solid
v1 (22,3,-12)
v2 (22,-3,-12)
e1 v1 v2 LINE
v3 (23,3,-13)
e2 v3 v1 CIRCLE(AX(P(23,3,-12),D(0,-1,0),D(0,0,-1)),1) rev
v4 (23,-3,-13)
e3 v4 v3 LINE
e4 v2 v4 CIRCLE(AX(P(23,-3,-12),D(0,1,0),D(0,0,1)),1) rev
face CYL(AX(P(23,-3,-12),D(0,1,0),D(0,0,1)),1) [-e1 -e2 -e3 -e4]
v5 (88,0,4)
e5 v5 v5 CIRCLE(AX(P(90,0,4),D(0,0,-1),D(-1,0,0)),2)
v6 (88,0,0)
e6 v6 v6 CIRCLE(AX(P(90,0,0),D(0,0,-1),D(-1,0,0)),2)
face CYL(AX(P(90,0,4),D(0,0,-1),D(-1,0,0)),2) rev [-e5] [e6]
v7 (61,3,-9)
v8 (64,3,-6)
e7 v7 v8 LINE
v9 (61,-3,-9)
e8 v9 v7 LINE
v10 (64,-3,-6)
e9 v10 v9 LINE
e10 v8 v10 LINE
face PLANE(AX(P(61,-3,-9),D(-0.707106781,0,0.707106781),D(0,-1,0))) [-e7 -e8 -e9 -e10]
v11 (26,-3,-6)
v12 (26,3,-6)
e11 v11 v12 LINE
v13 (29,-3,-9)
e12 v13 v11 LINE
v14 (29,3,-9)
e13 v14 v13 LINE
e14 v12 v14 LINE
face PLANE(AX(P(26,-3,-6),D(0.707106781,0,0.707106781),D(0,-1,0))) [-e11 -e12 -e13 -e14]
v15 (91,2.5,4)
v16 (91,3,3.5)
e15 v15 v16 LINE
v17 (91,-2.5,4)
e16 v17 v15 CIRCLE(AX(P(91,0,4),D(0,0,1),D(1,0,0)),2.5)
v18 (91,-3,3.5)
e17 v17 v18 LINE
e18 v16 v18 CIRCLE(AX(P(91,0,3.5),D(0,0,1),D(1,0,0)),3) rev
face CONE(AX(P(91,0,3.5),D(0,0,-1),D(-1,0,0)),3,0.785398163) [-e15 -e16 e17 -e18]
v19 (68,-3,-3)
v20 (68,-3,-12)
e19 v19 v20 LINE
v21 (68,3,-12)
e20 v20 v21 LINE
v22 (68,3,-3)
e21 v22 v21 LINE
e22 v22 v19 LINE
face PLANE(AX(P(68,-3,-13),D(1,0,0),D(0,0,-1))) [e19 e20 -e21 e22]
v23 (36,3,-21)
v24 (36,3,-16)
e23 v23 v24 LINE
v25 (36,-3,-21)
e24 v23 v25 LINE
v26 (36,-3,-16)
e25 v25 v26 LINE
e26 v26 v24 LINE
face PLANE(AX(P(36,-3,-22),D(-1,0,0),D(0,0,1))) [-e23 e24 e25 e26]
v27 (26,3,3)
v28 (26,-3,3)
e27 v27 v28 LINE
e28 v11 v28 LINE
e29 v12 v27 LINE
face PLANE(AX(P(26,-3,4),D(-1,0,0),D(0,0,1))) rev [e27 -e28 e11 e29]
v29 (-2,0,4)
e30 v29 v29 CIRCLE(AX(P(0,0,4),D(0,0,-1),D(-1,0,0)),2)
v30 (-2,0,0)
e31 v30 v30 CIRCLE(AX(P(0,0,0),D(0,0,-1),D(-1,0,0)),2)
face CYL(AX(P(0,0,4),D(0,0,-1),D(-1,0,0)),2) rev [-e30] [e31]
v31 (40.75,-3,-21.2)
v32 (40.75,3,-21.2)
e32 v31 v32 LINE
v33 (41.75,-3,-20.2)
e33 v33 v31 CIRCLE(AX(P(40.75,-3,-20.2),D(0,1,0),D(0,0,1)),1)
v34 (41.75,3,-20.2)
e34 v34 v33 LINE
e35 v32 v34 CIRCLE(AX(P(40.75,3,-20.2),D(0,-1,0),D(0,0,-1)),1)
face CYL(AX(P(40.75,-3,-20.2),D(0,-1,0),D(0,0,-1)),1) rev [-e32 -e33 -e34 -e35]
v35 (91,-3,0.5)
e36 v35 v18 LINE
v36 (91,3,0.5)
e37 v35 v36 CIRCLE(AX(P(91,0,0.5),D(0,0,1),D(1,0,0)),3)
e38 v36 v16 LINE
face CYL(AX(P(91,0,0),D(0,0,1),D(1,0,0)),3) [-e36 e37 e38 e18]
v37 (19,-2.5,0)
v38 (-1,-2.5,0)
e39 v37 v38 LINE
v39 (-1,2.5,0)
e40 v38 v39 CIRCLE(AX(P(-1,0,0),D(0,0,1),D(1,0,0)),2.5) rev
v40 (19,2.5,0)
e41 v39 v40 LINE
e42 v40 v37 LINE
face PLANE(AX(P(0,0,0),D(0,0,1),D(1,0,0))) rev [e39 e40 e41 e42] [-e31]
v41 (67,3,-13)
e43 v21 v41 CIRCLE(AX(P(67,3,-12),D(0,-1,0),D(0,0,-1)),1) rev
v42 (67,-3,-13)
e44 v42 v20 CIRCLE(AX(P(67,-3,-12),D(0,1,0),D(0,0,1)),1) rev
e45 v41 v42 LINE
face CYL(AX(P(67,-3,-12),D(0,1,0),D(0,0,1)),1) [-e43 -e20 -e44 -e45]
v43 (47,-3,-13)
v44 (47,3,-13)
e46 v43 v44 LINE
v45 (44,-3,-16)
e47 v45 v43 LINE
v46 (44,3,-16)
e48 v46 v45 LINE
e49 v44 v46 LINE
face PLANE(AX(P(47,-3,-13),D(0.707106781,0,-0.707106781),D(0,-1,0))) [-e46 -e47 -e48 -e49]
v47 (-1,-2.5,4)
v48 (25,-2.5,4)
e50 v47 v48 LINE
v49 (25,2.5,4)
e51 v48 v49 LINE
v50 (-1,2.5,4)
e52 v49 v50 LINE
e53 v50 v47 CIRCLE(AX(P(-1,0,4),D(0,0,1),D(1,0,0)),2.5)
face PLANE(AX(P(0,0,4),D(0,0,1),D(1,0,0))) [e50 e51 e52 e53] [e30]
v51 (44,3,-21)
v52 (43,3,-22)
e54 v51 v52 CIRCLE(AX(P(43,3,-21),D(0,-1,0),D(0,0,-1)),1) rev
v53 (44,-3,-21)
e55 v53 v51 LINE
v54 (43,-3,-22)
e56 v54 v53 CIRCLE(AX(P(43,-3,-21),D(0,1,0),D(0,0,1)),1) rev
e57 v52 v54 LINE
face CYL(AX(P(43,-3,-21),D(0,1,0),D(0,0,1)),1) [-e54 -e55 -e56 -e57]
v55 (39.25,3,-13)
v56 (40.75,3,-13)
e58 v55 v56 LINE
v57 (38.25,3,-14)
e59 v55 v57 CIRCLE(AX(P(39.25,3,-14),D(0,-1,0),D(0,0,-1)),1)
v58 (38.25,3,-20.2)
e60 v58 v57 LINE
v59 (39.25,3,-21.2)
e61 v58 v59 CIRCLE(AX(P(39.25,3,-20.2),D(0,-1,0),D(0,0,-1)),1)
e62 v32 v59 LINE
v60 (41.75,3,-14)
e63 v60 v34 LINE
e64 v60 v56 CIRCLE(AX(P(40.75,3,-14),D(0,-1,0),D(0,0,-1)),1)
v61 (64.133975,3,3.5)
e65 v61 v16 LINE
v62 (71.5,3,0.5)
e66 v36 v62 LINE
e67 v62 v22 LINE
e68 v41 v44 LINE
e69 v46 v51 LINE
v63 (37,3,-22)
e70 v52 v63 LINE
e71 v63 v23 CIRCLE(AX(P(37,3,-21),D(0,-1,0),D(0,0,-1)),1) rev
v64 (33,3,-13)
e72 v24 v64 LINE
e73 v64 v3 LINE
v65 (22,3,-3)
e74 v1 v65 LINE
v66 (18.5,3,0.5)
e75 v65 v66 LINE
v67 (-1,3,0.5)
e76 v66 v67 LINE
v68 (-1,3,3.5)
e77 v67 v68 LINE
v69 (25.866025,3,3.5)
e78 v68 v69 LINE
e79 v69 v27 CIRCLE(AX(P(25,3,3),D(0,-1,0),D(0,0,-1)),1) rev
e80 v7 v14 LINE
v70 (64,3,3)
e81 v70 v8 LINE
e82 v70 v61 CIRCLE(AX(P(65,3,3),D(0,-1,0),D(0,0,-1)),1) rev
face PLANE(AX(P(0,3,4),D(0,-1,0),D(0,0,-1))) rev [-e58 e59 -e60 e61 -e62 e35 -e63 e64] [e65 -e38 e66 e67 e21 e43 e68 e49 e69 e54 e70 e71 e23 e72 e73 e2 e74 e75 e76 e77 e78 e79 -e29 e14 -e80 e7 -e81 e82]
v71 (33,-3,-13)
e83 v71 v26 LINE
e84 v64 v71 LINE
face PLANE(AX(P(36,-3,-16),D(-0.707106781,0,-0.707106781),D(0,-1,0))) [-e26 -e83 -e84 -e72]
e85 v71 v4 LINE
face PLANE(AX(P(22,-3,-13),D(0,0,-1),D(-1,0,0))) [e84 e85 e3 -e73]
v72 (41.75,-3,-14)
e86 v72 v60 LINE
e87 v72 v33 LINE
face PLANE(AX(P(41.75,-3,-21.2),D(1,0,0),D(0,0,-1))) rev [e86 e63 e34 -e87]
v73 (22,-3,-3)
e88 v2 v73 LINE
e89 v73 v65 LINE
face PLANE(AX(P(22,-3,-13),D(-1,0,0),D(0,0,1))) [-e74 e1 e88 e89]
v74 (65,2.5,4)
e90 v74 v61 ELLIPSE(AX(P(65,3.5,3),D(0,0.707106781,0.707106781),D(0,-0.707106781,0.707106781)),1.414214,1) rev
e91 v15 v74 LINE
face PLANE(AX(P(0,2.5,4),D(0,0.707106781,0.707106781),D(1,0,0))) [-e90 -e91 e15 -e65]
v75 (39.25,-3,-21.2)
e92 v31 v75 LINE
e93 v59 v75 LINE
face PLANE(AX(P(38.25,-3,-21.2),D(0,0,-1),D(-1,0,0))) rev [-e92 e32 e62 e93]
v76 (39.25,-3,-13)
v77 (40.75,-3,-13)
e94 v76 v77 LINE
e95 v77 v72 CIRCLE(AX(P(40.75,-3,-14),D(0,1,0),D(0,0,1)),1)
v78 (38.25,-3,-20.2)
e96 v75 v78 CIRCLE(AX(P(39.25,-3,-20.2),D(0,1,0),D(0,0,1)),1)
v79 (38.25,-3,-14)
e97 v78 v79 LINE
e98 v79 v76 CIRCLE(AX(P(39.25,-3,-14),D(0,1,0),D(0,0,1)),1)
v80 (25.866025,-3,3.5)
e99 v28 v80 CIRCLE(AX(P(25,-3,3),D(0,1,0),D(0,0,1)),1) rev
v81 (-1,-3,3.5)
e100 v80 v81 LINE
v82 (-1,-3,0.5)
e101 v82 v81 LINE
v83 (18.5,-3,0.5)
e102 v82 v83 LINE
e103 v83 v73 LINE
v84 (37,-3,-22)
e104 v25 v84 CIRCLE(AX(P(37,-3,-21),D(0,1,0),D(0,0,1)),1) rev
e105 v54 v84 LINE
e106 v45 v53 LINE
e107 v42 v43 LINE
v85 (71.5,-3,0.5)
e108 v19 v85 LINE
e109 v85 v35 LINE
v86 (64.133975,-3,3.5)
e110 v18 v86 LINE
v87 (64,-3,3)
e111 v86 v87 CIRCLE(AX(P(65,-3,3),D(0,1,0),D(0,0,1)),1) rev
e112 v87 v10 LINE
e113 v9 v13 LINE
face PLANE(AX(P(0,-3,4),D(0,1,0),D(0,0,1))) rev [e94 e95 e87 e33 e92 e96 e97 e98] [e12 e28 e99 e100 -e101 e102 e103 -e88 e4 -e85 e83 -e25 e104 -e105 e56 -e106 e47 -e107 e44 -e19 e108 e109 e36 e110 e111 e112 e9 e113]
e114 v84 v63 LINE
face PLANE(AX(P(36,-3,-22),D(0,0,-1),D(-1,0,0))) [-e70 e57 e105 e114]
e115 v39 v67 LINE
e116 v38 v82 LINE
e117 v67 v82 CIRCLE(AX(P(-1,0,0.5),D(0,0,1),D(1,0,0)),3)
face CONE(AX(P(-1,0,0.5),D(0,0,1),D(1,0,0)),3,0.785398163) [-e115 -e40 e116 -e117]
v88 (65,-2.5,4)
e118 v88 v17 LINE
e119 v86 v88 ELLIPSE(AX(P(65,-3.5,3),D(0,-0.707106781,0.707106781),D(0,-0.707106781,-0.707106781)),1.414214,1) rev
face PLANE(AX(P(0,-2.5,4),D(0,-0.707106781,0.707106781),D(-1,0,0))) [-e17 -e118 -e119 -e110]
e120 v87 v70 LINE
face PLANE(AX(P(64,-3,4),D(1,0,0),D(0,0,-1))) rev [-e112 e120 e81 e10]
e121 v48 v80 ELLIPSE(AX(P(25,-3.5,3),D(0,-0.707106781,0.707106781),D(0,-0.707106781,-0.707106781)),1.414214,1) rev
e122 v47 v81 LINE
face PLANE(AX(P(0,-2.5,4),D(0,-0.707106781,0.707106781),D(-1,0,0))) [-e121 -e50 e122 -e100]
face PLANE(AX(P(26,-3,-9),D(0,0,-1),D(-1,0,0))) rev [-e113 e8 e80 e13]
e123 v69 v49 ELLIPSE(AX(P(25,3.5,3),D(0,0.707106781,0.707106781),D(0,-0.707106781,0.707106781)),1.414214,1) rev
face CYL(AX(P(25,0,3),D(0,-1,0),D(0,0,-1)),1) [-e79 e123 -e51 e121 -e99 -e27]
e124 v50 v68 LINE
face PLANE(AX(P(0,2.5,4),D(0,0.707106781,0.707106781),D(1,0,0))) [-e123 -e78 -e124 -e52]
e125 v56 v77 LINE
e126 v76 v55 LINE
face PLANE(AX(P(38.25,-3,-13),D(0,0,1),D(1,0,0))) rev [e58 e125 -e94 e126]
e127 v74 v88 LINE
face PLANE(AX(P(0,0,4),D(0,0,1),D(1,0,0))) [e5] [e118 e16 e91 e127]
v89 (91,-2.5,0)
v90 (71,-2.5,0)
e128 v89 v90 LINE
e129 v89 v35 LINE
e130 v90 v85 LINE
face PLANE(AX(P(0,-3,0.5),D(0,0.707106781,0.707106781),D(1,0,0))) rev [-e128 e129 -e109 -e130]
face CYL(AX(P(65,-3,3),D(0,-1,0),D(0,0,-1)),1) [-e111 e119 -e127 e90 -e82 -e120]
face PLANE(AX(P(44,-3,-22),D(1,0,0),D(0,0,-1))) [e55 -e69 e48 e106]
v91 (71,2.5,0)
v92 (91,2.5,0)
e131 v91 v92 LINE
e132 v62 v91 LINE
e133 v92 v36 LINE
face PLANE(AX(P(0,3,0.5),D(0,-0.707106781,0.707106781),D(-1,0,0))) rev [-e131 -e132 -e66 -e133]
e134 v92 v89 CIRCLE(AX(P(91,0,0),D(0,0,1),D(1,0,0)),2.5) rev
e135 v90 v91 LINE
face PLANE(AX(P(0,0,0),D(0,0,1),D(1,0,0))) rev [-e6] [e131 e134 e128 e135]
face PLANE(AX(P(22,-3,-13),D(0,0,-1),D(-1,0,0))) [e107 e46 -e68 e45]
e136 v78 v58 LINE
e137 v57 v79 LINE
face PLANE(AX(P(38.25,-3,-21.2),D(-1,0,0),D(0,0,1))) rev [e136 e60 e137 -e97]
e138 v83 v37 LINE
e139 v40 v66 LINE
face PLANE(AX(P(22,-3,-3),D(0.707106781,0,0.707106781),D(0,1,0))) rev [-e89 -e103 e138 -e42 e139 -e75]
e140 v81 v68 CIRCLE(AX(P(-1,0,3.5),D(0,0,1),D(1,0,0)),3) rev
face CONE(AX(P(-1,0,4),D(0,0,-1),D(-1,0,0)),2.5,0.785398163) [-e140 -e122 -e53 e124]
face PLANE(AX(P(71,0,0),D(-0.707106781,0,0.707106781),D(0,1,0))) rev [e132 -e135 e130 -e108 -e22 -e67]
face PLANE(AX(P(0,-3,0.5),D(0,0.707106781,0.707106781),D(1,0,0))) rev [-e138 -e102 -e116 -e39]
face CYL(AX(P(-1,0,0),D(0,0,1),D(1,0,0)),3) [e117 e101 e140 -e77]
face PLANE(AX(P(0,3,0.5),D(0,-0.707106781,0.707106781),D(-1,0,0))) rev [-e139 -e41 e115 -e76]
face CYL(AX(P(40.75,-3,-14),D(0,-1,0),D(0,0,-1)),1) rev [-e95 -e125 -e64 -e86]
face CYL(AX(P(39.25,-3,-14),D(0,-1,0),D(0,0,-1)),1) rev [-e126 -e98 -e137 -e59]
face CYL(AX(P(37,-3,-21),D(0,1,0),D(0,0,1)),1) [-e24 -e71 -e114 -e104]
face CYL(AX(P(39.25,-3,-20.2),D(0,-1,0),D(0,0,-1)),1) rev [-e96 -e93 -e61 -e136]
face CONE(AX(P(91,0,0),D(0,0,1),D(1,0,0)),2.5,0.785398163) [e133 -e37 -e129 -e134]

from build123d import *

# Parameters (mm, degrees)
CROQUIS1_R                = 3
SALIENTE_EXTRUIR1_DEPTH   = 4
SALIENTE_EXTRUIR1_2_DEPTH = 4
CROQUIS2_W                = 90
CROQUIS2_H                = 6
SALIENTE_EXTRUIR2_DEPTH   = 4
CROQUIS4_W                = 46
CROQUIS4_H                = 13
SALIENTE_EXTRUIR3_DEPTH   = 6
CROQUIS5_W                = 38
CROQUIS5_H                = 13
CORTAR_EXTRUIR1_DEPTH     = 95.09569597
CROQUIS6_W                = 8
CROQUIS6_H                = 9
SALIENTE_EXTRUIR4_DEPTH   = 3
CROQUIS7_W                = 3.5
CROQUIS7_H                = 8.2
CORTAR_EXTRUIR2_DEPTH     = 96.754895436
CHAFL_N1_SIZE             = 3
REDONDEO1_R               = 1
CROQUIS8_R                = 1.75
CORTAR_EXTRUIR3_DEPTH     = 97.612628574
SALIENTE_EXTRUIR5_DEPTH   = 4
CROQUIS10_R               = 2
CORTAR_EXTRUIR4_DEPTH     = 97.586748573
CHAFL_N2_SIZE             = 0.5


with BuildPart() as part:
    # Croquis1 → Saliente-Extruir1 (new body)
    with BuildSketch(Plane.XY):
        Circle(CROQUIS1_R)
    extrude(amount=SALIENTE_EXTRUIR1_DEPTH)



with BuildPart() as body_2:
    # Croquis1 → Saliente-Extruir1 2 (new body)
    with BuildSketch(Plane.XY):
        with Locations((90, 0)):
            Circle(CROQUIS1_R)
    extrude(amount=SALIENTE_EXTRUIR1_2_DEPTH)


with BuildPart() as part_1:
    add(part.part)

    add(body_2.part)  # Saliente-Extruir2 merges body 2
    # Croquis2 → Saliente-Extruir2 (add)
    with BuildSketch(Plane.XY):
        with Locations((45, 0)):
            Rectangle(CROQUIS2_W, CROQUIS2_H)
    extrude(amount=SALIENTE_EXTRUIR2_DEPTH)

    # Croquis4 → Saliente-Extruir3 (add)
    with BuildSketch(Plane(origin=(0, 3, 0), x_dir=(1, 0, 0), z_dir=(0, 1, 0))):
        with Locations((45, 6.5)):
            Rectangle(CROQUIS4_W, CROQUIS4_H)
    extrude(amount=-SALIENTE_EXTRUIR3_DEPTH)

    # Croquis5 → Cortar-Extruir1 (cut, through all)
    with BuildSketch(Plane(origin=(0, 3, 0), x_dir=(1, 0, 0), z_dir=(0, 1, 0))):
        with Locations((45, 2.5)):
            Rectangle(CROQUIS5_W, CROQUIS5_H)
    extrude(amount=-CORTAR_EXTRUIR1_DEPTH, mode=Mode.SUBTRACT)

    # Croquis6 → Saliente-Extruir4 (add, symmetric)
    with BuildSketch(Plane(origin=(0, 0, 0), x_dir=(1, 0, 0), z_dir=(0, 1, 0))):
        with Locations((40, 17.5)):
            Rectangle(CROQUIS6_W, CROQUIS6_H)
    extrude(amount=SALIENTE_EXTRUIR4_DEPTH, both=True)

    # Croquis7 → Cortar-Extruir2 (cut, through all)
    with BuildSketch(Plane(origin=(0, 3, 0), x_dir=(1, 0, 0), z_dir=(0, 1, 0))):
        with Locations((40, 17.1)):
            Rectangle(CROQUIS7_W, CROQUIS7_H)
    extrude(amount=-CORTAR_EXTRUIR2_DEPTH, mode=Mode.SUBTRACT)

    # Chaflán1
    chafl_n1_edges = [part_1.edges().sort_by_distance(p)[0] for p in [
        (22, 0, 0),
        (68, 0, 0),
        (26, 0, -9),
        (64, 0, -9),
        (36, 0, -13),
        (44, 0, -13),
    ]]
    chamfer(chafl_n1_edges, length=CHAFL_N1_SIZE)

    # Redondeo1
    redondeo1_edges = [part_1.edges().sort_by_distance(p)[0] for p in [
        (22, 0, -13),
        (68, 0, -13),
        (26, 0, 4),
        (64, 0, 4),
        (36, 0, -22),
        (44, 0, -22),
        (38.25, 0, -13),
        (38.25, 0, -21.2),
        (41.75, 0, -21.2),
        (41.75, 0, -13),
    ]]
    fillet(redondeo1_edges, radius=REDONDEO1_R)

    # Croquis8 → Cortar-Extruir3 (cut, through all)
    with BuildSketch(Plane.XY.offset(4)):
        Circle(CROQUIS8_R)
        with Locations((90, 0)):
            Circle(CROQUIS8_R)
    extrude(amount=-CORTAR_EXTRUIR3_DEPTH, mode=Mode.SUBTRACT)

    # Croquis9 → Saliente-Extruir5 (add)
    with BuildSketch(Plane.XY.offset(4)):
        with BuildLine():
            Line((-1, 3), (0, 3))
            Line((0, 3), (0, 2.5))
            ThreePointArc((0, 2.5), (-2.5, 0), (0, -2.5))
            Line((0, -2.5), (0, -3))
            Line((0, -3), (-1, -3))
            ThreePointArc((-1, -3), (-4, 0), (-1, 3))
        make_face()
    saliente_extruir5 = extrude(amount=-SALIENTE_EXTRUIR5_DEPTH)

    # Simetría1: Saliente-Extruir5 across plane
    add(saliente_extruir5.mirror(Plane(origin=(45, 0, 0), x_dir=(0, 0, 1), z_dir=(1, 0, 0))))

    # Croquis10 → Cortar-Extruir4 (cut, through all)
    with BuildSketch(Plane(origin=(0, 0, 0), x_dir=(-1, 0, 0), z_dir=(0, 0, -1))):
        Circle(CROQUIS10_R)
        with Locations((-90, 0)):
            Circle(CROQUIS10_R)
    extrude(amount=-CORTAR_EXTRUIR4_DEPTH, mode=Mode.SUBTRACT)

    # Chaflán2
    # the kernel refuses this chamfer: 0.5 mm, written as the material it takes off along each edge
    with BuildSketch(Plane(origin=(63.714158506, 3, 4), x_dir=(0, 0.027495876610586487, -0.9996219169112968), z_dir=(1, 0, 0)), Plane(origin=(-1, -3, 4), x_dir=(0, 0.9996219169112968, 0.027495876610585623), z_dir=(1, 0, 0)), Plane(origin=(-1, 3, 4), x_dir=(0, 0.027495876610590796, -0.9996219169112965), z_dir=(1, 0, 0)), Plane(origin=(63.714158506, -3, 4), x_dir=(0, 0.9996219169112968, 0.027495876610585623), z_dir=(1, 0, 0))) as chafl_n2_piece_1:
        Polygon((CHAFL_N2_SIZE * 0.999621916911, -CHAFL_N2_SIZE * 0.0274958766106), (-CHAFL_N2_SIZE * 0.0274958766106, -CHAFL_N2_SIZE * 0.999621916911), (0, 0), align=None)
    extrude(amount=27.285841494, mode=Mode.SUBTRACT)
    with BuildSketch(Plane(origin=(-1, 0, 0), x_dir=(0, -1, 0), z_dir=(1, 0, 0))) as chafl_n2_piece_2:
        Polygon((3, -CHAFL_N2_SIZE), (3 - CHAFL_N2_SIZE, 0), (3, 0), align=None)
    revolve(axis=Axis((-1, 0, 0), (0, 0, -1)), revolution_arc=180, mode=Mode.SUBTRACT)
    with BuildSketch(Plane(origin=(-1, 0, 4), x_dir=(0, -1, 0), z_dir=(1, 0, 0))) as chafl_n2_piece_3:
        Polygon((3 - CHAFL_N2_SIZE, 0), (3, CHAFL_N2_SIZE), (3, 0), align=None)
    revolve(axis=Axis((-1, 0, 4), (0, 0, -1)), revolution_arc=180, mode=Mode.SUBTRACT)
    with BuildSketch(Plane(origin=(91, 0, 4), x_dir=(0, -1, 0), z_dir=(-1, 0, 0))) as chafl_n2_piece_4:
        Polygon((3, -CHAFL_N2_SIZE), (3 - CHAFL_N2_SIZE, 0), (3, 0), align=None)
    revolve(axis=Axis((91, 0, 4), (0, 0, 1)), revolution_arc=180, mode=Mode.SUBTRACT)
    with BuildSketch(Plane(origin=(91, 0, 0), x_dir=(0, -1, 0), z_dir=(-1, 0, 0))) as chafl_n2_piece_5:
        Polygon((3 - CHAFL_N2_SIZE, 0), (3, CHAFL_N2_SIZE), (3, 0), align=None)
    revolve(axis=Axis((91, 0, 0), (0, 0, 1)), revolution_arc=180, mode=Mode.SUBTRACT)
    with BuildSketch(Plane(origin=(91, -3, 0), x_dir=(0, 0.9996219169112968, -0.027495876610586365), z_dir=(-1, 0, 0))) as chafl_n2_piece_6_section:
        Polygon((CHAFL_N2_SIZE * 0.999621916911, -CHAFL_N2_SIZE * 0.0274958766106), (-CHAFL_N2_SIZE * 0.0274958766106, -CHAFL_N2_SIZE * 0.999621916911), (0, 0), align=None)
    chafl_n2_piece_6 = extrude(amount=21.285841494, mode=Mode.PRIVATE)
    chafl_n2_piece_6 = split(chafl_n2_piece_6, bisect_by=Plane(origin=(80.80759364, -2.786891573, 9.80759364), z_dir=(0.7071067811865476, 0, -0.7071067811865476)), keep=Keep.TOP, mode=Mode.PRIVATE)
    add(chafl_n2_piece_6, mode=Mode.SUBTRACT)
    with BuildSketch(Plane(origin=(20.285841494, -3, 0), x_dir=(0, 0.9996219169112968, -0.027495876610586365), z_dir=(-1, 0, 0))) as chafl_n2_piece_7_section:
        Polygon((CHAFL_N2_SIZE * 0.999621916911, -CHAFL_N2_SIZE * 0.0274958766106), (-CHAFL_N2_SIZE * 0.0274958766106, -CHAFL_N2_SIZE * 0.999621916911), (0, 0), align=None)
    chafl_n2_piece_7 = extrude(amount=21.285841494, mode=Mode.PRIVATE)
    chafl_n2_piece_7 = split(chafl_n2_piece_7, bisect_by=Plane(origin=(14.099970333, -2.8351922, 4.900029667), z_dir=(-0.7071067811865476, 0, -0.7071067811865476)), keep=Keep.TOP, mode=Mode.PRIVATE)
    add(chafl_n2_piece_7, mode=Mode.SUBTRACT)
    with BuildSketch(Plane(origin=(20.285841494, 3, 0), x_dir=(0, 0.027495876610586494, 0.9996219169112968), z_dir=(-1, 0, 0))) as chafl_n2_piece_8_section:
        Polygon((CHAFL_N2_SIZE * 0.999621916911, -CHAFL_N2_SIZE * 0.0274958766106), (-CHAFL_N2_SIZE * 0.0274958766106, -CHAFL_N2_SIZE * 0.999621916911), (0, 0), align=None)
    chafl_n2_piece_8 = extrude(amount=21.285841494, mode=Mode.PRIVATE)
    chafl_n2_piece_8 = split(chafl_n2_piece_8, bisect_by=Plane(origin=(14.099970416, 2.835192201, 4.900029584), z_dir=(-0.7071067811865476, 0, -0.7071067811865476)), keep=Keep.TOP, mode=Mode.PRIVATE)
    add(chafl_n2_piece_8, mode=Mode.SUBTRACT)
    with BuildSketch(Plane(origin=(91, 3, 0), x_dir=(0, 0.027495876610590803, 0.9996219169112965), z_dir=(-1, 0, 0))) as chafl_n2_piece_9_section:
        Polygon((CHAFL_N2_SIZE * 0.999621916911, -CHAFL_N2_SIZE * 0.0274958766106), (-CHAFL_N2_SIZE * 0.0274958766106, -CHAFL_N2_SIZE * 0.999621916911), (0, 0), align=None)
    chafl_n2_piece_9 = extrude(amount=21.285841494, mode=Mode.PRIVATE)
    chafl_n2_piece_9 = split(chafl_n2_piece_9, bisect_by=Plane(origin=(75.900029584, 2.835192201, 4.900029584), z_dir=(0.7071067811865476, 0, -0.7071067811865476)), keep=Keep.TOP, mode=Mode.PRIVATE)
    add(chafl_n2_piece_9, mode=Mode.SUBTRACT)


solid = part_1.part
